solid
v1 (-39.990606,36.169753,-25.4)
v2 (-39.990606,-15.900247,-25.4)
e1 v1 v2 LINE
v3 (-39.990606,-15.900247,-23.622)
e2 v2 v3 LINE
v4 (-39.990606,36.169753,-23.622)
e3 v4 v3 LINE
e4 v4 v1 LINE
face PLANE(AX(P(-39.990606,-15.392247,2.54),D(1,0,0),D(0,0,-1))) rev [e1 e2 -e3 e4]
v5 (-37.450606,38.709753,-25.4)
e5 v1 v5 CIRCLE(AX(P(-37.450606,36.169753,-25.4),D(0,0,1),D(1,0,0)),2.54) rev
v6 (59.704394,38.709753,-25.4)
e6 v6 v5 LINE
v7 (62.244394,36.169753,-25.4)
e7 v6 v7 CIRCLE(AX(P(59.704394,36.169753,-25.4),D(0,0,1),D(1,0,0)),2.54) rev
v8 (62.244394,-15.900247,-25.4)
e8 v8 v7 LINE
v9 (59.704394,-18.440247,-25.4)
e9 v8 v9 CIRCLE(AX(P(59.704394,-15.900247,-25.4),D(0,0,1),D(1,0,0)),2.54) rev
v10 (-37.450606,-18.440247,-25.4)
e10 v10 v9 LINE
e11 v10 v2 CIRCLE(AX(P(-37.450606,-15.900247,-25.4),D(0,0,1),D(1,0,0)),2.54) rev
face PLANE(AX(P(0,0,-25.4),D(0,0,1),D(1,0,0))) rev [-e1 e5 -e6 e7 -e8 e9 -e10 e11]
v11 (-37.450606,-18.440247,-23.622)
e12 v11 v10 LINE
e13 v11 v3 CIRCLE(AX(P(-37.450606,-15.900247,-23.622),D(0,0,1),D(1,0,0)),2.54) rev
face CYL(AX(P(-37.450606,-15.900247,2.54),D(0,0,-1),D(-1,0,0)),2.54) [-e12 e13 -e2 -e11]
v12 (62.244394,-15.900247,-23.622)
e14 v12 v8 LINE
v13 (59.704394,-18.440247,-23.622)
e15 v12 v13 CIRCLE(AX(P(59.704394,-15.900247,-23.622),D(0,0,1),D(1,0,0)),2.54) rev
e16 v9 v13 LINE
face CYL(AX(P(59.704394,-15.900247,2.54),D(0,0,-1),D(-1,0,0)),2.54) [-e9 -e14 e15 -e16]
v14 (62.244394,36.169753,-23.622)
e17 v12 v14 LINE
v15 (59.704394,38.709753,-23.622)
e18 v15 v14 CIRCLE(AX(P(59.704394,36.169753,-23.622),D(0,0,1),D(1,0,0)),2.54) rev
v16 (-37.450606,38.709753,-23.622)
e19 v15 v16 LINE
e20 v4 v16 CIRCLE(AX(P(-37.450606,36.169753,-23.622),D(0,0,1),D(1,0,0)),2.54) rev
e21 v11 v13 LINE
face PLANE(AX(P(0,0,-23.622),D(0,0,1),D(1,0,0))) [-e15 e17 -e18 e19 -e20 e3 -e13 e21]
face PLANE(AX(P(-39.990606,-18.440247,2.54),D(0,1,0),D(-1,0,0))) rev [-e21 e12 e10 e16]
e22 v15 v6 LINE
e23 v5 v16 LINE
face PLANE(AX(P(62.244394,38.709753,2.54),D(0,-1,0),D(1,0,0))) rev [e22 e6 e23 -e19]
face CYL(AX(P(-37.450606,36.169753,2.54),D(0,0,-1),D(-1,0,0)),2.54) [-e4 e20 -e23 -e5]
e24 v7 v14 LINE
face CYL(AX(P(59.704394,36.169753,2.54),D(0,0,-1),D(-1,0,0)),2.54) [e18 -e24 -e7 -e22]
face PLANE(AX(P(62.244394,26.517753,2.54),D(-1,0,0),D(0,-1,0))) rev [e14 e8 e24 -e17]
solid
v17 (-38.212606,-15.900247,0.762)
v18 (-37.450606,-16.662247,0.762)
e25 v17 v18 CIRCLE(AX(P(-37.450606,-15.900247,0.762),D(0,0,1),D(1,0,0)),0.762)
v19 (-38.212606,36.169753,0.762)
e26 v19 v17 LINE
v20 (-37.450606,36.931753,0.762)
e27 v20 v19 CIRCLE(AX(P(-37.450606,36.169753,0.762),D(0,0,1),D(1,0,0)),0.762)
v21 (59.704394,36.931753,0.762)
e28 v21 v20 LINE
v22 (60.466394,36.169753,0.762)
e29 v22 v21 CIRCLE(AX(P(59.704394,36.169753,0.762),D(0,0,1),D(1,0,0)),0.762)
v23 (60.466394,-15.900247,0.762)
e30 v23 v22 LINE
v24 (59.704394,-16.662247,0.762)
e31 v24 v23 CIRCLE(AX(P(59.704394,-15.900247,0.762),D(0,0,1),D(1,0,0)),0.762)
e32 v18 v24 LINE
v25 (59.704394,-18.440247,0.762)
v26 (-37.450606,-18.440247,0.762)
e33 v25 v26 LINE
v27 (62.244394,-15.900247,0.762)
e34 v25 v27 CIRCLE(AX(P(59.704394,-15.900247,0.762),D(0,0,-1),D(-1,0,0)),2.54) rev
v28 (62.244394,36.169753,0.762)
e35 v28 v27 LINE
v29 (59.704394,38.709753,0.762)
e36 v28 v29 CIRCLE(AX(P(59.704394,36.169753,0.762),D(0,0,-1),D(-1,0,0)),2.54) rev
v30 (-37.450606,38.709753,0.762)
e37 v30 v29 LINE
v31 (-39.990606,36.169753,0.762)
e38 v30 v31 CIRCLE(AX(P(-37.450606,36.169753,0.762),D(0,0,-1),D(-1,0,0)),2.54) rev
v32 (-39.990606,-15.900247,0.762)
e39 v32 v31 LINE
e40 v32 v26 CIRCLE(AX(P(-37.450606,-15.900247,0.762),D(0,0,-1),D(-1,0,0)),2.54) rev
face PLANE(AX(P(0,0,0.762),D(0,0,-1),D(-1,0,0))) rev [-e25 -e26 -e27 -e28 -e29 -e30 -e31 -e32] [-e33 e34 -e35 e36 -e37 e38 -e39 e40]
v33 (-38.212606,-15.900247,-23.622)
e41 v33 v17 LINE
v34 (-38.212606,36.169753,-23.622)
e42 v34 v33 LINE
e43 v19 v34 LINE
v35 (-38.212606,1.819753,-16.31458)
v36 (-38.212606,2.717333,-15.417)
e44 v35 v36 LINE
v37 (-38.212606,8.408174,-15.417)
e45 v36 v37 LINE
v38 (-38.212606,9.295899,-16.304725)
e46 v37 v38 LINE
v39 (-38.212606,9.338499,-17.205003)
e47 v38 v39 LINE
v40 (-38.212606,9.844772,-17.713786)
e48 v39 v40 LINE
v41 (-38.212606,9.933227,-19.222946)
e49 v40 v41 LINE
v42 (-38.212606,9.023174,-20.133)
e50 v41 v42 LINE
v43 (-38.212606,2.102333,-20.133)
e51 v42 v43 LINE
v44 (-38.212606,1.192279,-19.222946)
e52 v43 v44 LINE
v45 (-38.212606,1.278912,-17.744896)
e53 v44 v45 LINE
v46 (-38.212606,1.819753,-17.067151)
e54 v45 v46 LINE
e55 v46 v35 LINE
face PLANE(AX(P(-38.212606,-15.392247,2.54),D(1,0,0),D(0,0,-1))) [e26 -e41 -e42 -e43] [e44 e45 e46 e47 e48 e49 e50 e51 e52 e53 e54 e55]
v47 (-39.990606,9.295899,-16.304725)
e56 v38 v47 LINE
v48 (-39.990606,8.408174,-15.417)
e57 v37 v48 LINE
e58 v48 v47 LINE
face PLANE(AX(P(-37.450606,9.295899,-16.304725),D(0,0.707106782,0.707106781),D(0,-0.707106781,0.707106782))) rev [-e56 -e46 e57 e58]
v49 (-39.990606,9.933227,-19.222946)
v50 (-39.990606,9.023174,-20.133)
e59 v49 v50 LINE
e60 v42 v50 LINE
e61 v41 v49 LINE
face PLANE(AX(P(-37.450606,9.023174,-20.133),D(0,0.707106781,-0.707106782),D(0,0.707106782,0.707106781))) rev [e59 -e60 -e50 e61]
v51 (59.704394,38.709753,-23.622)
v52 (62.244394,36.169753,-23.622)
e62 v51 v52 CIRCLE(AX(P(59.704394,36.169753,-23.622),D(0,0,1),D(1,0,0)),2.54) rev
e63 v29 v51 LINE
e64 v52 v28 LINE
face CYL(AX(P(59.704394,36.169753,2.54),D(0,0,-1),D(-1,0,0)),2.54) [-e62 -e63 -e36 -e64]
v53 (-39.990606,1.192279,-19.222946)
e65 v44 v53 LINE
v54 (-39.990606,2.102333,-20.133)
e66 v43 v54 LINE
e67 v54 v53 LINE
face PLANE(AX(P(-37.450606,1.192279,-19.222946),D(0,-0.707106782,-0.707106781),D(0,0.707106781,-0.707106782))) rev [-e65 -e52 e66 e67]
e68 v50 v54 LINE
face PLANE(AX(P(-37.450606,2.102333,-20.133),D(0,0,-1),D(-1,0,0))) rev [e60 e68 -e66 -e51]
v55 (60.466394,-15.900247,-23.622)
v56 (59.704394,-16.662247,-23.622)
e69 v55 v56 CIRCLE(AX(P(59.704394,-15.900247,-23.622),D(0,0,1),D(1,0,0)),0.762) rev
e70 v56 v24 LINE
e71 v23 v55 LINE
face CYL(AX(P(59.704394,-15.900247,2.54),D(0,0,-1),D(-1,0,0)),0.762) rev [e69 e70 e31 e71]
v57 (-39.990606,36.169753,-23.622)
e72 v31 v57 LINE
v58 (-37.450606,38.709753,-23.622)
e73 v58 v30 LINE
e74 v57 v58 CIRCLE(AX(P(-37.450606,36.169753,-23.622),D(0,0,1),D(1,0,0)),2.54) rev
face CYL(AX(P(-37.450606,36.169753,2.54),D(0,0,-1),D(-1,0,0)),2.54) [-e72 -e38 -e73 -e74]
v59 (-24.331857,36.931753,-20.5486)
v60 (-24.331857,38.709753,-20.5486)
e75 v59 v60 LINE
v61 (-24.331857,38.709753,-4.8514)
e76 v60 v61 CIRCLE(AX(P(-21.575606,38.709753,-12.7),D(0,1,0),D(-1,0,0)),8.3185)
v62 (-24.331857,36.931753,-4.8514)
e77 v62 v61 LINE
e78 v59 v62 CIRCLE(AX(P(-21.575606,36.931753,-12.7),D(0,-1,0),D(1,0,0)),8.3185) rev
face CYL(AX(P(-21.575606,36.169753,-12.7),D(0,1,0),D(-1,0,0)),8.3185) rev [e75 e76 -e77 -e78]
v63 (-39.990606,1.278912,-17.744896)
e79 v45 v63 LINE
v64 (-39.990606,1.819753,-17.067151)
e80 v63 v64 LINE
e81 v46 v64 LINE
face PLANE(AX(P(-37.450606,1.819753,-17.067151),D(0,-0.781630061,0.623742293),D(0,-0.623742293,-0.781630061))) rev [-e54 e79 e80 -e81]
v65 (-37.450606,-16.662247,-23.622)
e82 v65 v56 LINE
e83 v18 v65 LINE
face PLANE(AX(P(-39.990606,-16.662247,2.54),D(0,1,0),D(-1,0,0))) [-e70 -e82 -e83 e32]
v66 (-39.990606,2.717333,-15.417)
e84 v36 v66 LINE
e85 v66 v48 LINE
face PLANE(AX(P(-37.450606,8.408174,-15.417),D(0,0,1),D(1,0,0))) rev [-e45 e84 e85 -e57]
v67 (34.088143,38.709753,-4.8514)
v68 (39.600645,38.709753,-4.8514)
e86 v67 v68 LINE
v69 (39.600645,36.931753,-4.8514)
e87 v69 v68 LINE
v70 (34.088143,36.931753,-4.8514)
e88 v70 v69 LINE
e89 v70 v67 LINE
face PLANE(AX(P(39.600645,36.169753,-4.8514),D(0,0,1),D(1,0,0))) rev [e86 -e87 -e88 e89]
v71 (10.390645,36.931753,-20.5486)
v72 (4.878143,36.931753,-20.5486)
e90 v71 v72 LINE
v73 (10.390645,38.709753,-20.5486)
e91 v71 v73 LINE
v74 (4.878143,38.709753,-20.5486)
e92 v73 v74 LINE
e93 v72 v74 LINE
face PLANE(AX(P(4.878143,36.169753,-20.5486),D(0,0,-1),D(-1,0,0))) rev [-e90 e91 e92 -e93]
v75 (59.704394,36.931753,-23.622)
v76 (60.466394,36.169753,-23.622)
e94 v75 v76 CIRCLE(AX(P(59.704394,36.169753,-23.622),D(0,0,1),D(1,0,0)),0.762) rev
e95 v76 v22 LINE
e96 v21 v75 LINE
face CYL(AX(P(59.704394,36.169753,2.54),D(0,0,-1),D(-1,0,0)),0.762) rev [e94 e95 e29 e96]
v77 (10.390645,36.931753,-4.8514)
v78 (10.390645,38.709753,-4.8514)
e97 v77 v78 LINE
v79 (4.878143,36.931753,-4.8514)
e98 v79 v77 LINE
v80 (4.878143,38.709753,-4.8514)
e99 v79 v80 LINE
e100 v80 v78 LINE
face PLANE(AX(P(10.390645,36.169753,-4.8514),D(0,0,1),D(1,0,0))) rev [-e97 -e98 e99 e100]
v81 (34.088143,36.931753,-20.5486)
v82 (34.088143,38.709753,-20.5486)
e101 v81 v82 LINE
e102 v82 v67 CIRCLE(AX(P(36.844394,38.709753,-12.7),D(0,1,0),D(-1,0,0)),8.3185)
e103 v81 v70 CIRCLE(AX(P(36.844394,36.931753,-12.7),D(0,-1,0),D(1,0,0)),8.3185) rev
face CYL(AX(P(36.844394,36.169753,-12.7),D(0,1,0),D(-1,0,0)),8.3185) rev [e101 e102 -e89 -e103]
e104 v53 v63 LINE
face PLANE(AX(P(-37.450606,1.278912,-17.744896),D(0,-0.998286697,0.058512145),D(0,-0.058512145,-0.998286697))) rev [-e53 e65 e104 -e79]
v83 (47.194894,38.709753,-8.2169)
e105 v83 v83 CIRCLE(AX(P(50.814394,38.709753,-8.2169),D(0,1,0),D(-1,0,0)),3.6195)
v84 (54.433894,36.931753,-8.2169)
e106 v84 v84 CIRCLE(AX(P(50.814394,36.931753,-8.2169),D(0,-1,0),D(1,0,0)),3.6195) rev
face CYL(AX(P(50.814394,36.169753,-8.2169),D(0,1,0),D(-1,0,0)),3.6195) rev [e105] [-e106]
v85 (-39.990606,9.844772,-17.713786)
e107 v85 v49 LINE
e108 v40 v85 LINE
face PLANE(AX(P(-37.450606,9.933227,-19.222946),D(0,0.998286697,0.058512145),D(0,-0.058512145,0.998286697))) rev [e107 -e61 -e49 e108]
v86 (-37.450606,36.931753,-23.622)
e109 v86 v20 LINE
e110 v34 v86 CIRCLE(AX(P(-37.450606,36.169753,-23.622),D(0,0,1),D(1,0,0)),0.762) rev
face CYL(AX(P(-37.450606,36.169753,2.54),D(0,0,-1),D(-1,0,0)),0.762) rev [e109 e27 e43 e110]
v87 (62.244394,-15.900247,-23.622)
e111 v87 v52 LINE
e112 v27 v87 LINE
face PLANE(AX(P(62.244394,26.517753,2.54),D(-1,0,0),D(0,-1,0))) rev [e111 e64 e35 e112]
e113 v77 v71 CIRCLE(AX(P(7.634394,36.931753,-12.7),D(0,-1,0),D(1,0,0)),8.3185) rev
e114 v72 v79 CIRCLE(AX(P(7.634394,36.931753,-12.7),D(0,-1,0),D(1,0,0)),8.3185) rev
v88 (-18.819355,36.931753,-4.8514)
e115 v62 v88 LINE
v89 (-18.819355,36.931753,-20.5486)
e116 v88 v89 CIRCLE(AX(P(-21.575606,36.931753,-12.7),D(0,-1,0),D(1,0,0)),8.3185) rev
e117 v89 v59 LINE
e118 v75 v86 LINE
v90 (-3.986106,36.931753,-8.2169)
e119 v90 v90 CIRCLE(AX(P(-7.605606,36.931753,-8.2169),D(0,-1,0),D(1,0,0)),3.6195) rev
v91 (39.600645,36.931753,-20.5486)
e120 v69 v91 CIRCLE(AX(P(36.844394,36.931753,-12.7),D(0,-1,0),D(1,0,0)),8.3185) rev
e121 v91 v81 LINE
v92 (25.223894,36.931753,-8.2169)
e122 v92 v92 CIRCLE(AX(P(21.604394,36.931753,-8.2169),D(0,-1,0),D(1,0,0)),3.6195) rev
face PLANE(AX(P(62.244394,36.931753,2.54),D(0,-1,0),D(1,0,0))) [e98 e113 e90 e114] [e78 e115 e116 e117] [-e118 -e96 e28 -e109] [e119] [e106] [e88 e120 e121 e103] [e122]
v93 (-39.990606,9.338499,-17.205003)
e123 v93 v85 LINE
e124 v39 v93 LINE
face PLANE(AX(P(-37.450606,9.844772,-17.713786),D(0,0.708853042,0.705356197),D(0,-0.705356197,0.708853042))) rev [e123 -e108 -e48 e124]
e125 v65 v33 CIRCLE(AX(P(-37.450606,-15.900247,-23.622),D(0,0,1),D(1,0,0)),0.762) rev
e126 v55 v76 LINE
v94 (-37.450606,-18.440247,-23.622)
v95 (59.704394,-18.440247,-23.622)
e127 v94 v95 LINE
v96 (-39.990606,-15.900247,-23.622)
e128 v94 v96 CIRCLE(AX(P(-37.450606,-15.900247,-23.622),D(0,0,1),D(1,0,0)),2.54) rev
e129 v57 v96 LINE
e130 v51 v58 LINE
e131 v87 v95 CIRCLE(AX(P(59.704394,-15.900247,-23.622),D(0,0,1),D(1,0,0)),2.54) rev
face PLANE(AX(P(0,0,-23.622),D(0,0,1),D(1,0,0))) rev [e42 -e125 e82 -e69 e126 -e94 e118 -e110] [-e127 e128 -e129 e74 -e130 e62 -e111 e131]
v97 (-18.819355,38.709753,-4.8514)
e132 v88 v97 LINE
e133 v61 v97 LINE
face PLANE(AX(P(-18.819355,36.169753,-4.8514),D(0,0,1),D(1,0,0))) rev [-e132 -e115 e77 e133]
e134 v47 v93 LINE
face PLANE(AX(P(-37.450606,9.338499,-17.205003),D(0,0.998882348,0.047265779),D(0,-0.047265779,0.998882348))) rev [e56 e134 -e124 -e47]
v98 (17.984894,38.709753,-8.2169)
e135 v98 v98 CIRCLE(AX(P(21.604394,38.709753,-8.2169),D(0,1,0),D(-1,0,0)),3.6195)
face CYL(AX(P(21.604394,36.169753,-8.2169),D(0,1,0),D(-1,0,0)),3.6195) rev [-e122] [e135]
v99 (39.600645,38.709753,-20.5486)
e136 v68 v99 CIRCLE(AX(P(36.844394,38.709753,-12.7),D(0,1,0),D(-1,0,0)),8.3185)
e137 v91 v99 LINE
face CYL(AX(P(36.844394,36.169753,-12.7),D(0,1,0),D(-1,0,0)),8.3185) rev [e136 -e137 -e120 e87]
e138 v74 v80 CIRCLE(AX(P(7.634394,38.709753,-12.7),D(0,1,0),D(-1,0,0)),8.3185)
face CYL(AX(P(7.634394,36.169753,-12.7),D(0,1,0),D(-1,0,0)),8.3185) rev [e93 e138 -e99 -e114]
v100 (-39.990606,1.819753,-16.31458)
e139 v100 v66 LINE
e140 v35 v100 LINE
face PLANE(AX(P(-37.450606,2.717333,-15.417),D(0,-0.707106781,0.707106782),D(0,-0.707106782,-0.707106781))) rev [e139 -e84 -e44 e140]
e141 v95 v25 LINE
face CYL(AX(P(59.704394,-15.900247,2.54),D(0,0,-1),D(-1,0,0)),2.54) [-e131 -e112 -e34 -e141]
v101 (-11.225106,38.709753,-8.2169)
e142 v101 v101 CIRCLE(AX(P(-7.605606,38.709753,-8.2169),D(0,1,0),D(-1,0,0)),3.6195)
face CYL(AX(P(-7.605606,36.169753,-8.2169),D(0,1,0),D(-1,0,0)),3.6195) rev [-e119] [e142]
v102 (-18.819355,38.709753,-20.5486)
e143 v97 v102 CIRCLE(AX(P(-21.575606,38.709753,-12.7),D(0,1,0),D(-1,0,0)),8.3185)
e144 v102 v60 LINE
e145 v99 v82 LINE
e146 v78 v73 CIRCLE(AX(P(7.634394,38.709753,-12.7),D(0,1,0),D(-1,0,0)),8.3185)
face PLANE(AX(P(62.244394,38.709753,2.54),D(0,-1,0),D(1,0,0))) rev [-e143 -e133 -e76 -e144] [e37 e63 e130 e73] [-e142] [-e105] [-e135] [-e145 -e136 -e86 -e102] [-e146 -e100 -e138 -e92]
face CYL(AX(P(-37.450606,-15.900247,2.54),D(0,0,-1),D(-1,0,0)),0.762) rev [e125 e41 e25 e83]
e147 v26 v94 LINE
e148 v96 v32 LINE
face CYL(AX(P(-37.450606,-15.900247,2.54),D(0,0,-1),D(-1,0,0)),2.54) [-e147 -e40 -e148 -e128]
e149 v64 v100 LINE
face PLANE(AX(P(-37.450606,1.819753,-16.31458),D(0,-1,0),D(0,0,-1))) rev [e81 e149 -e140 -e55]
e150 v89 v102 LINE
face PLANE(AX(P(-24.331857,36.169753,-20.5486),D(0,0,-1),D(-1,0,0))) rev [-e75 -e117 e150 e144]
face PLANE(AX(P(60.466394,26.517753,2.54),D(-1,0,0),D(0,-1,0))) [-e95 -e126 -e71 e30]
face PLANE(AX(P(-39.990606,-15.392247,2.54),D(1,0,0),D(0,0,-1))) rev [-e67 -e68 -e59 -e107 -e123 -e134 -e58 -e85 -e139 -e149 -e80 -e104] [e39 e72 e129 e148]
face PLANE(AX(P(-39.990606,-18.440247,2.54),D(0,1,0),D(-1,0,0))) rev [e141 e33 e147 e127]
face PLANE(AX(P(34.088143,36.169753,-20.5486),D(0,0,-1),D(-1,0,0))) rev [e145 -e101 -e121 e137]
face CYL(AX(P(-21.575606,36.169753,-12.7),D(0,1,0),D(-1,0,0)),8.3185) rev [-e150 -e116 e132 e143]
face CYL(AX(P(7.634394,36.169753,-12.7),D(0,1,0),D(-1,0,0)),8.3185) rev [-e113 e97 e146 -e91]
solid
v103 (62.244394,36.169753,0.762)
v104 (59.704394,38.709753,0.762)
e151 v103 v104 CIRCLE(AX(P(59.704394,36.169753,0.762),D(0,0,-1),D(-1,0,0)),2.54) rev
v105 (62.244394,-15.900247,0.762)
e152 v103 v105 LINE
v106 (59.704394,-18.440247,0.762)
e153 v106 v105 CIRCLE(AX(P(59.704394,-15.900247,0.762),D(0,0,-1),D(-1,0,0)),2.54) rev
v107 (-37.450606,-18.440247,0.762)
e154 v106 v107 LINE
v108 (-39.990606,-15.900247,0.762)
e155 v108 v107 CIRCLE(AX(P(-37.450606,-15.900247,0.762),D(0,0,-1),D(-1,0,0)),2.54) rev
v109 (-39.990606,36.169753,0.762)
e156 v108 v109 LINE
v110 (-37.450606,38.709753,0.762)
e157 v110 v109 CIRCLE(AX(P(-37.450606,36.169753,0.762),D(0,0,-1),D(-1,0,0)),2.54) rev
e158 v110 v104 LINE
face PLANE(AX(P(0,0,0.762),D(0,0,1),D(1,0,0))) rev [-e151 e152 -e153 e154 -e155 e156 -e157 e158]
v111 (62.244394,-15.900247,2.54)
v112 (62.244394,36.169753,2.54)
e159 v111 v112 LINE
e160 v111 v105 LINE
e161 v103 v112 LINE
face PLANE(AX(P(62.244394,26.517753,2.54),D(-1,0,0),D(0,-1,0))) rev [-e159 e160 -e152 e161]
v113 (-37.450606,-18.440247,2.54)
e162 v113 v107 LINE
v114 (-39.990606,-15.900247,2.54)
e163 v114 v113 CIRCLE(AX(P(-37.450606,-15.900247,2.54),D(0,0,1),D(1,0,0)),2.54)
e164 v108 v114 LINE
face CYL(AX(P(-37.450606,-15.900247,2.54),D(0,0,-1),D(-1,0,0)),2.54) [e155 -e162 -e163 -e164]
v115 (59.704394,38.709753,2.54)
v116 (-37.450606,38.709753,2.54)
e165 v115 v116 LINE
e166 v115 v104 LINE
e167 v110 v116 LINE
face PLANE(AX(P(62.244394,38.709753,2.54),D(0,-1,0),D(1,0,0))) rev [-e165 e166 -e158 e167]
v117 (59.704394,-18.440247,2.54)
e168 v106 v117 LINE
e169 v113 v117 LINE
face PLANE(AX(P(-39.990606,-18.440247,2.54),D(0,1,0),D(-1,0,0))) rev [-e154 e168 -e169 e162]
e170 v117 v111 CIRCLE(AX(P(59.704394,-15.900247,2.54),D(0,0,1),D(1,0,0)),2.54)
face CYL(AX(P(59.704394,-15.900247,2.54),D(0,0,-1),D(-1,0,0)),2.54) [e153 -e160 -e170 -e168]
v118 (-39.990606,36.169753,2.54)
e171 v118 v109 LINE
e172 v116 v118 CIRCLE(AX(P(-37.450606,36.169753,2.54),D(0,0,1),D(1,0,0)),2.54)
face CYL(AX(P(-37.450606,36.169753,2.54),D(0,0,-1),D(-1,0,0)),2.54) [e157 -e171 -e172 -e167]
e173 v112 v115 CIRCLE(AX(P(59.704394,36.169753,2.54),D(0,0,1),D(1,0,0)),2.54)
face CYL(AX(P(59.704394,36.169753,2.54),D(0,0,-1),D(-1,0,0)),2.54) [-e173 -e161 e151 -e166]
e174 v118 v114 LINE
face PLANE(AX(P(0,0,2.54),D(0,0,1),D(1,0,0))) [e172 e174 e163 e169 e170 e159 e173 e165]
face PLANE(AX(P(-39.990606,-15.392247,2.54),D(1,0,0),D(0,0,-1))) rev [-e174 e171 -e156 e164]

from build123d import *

# Parameters (mm, degrees)
BOSS_EXTRUDE1_DEPTH      = 2.54
BOSS_EXTRUDE1_DEPTH_BACK = 25.4
CUT_EXTRUDE1_DEPTH       = 2.54
SKETCH4_R                = 3.6195
CUT_EXTRUDE3_DEPTH       = 2.54
FILLET1_R                = 2.54
SKETCH3_W                = 11.508
SKETCH3_H                = 9.508
CUT_EXTRUDE2_DEPTH       = 1.27
SKETCH7_W                = 14.782
SKETCH7_H                = 12.682999998
BOSS_EXTRUDE2_DEPTH      = 2.54
SHELL1_START             = -23.622
SHELL1_DEPTH             = 24.384
SPLIT1_START             = -25.4
SPLIT1_DEPTH             = 1.778
SPLIT1_2_DEPTH           = 1.778
SPLIT1_START_2           = 0.762
SPLIT1_3_DEPTH           = 1.778
SPLIT1_4_DEPTH           = 1.778


# Read off the part's stored shape, not the designer's step: Shell1, Split1
with BuildPart() as part:
    # Sketch1 → Boss-Extrude1 (new, two sides: drawn at the far end of the back side and taken through both)
    with BuildSketch(Plane.XY.offset(-BOSS_EXTRUDE1_DEPTH_BACK)):
        Polygon((-39.990606027, -18.440246583), (62.244393973, -18.440246583), (62.244393973, -15.392246583), (62.244393973, 26.517753417), (62.244393973, 38.709753417), (-39.990606027, 38.709753417), (-39.990606027, 26.517753417), (-39.990606027, -15.392246583), align=None)
    extrude(amount=BOSS_EXTRUDE1_DEPTH + BOSS_EXTRUDE1_DEPTH_BACK)

    # Sketch2 → Cut-Extrude1 (cut)
    with BuildSketch(Plane.ZY.offset(39.990606027)):
        Polygon((-20.133, 2.102332927), (-20.133, 9.023173906), (-19.222946487, 9.93322742), (-17.713785822, 9.844771641), (-17.205002954, 9.338498651), (-16.304724783, 9.29589869), (-15.417, 8.408173907), (-15.417, 2.717332928), (-16.31457951, 1.819753417), (-17.067151023, 1.819753417), (-17.744895832, 1.278911755), (-19.222946485, 1.192279414), align=None)
    extrude(amount=-CUT_EXTRUDE1_DEPTH, mode=Mode.SUBTRACT)

    # Sketch4 → Cut-Extrude3 (cut)
    with BuildSketch(Plane(origin=(0, 38.709753417, 0), x_dir=(1, 0, 0), z_dir=(0, 1, 0))):
        with Locations(Location((-7.605606027, 8.2169, 0), (0, 0, 180))):
            Circle(SKETCH4_R)
        with Locations(Location((21.604393973, 8.2169, 0), (0, 0, 180))):
            Circle(SKETCH4_R)
        with Locations(Location((50.814393973, 8.2169, 0), (0, 0, 180))):
            Circle(SKETCH4_R)
        with BuildLine():
            Line((-24.331857157, 20.5486), (-18.819354898, 20.5486))
            ThreePointArc((-18.819354898, 20.5486), (-13.257106027, 12.7), (-18.819354898, 4.8514))
            Line((-18.819354898, 4.8514), (-24.331857157, 4.8514))
            ThreePointArc((-24.331857157, 4.8514), (-29.894106027, 12.7), (-24.331857157, 20.5486))
        make_face()
        with BuildLine():
            Line((10.390645102, 4.8514), (4.878142843, 4.8514))
            ThreePointArc((4.878142843, 4.8514), (-0.684106027, 12.7), (4.878142843, 20.5486))
            Line((4.878142843, 20.5486), (10.390645102, 20.5486))
            ThreePointArc((10.390645102, 20.5486), (15.952893973, 12.7), (10.390645102, 4.8514))
        make_face()
        with BuildLine():
            Line((39.600645102, 4.8514), (34.088142843, 4.8514))
            ThreePointArc((34.088142843, 4.8514), (28.525893973, 12.7), (34.088142843, 20.5486))
            Line((34.088142843, 20.5486), (39.600645102, 20.5486))
            ThreePointArc((39.600645102, 20.5486), (45.162893973, 12.7), (39.600645102, 4.8514))
        make_face()
    extrude(amount=-CUT_EXTRUDE3_DEPTH, mode=Mode.SUBTRACT)

    # Fillet1
    fillet1_edges = [part.edges().sort_by_distance(p)[0] for p in [
        (-39.990606027, 38.709753417, -11.43),
        (62.244393973, 38.709753417, -11.43),
        (62.244393973, -18.440246583, -11.43),
        (-39.990606027, -18.440246583, -11.43),
    ]]
    fillet(fillet1_edges, radius=FILLET1_R)

    # Sketch3 → Cut-Extrude2 (cut)
    with BuildSketch(Plane.ZY.offset(39.990606027)):
        with Locations((-8.929, 4.610253417)):
            Rectangle(SKETCH3_W, SKETCH3_H)
    extrude(amount=-CUT_EXTRUDE2_DEPTH, mode=Mode.SUBTRACT)

    # Sketch7 → Boss-Extrude2 (add)
    with BuildSketch(Plane.ZY.offset(39.990606027)):
        with Locations((-8.026, 5.562753418)):
            Rectangle(SKETCH7_W, SKETCH7_H)
    extrude(amount=-BOSS_EXTRUDE2_DEPTH)

    # Shell1 outline → Shell1 (cut)
    with BuildSketch(Plane.XY.offset(SHELL1_START)):
        with BuildLine():
            Line((-38.212606027, 1.819753417), (-38.212606027, -15.900246583))
            ThreePointArc((-38.212606027, -15.900246583), (-37.989421394, -16.43906195), (-37.450606027, -16.662246583))
            Line((-37.450606027, -16.662246583), (59.704393973, -16.662246583))
            ThreePointArc((59.704393973, -16.662246583), (60.24320934, -16.43906195), (60.466393973, -15.900246583))
            Line((60.466393973, -15.900246583), (60.466393973, 36.169753417))
            ThreePointArc((60.466393973, 36.169753417), (60.24320934, 36.708568784), (59.704393973, 36.931753417))
            Line((59.704393973, 36.931753417), (-37.450606027, 36.931753417))
            ThreePointArc((-37.450606027, 36.931753417), (-37.989421394, 36.708568784), (-38.212606027, 36.169753417))
            Line((-38.212606027, 36.169753417), (-38.212606027, 1.819753417))
        make_face()
    extrude(amount=SHELL1_DEPTH, mode=Mode.SUBTRACT)

    # Split1 2 outline → Split1 2 (cut)
    with BuildSketch(Plane.XY.offset(SPLIT1_START)):
        with BuildLine():
            Line((-37.450606027, -18.440246583), (59.704393973, -18.440246583))
            ThreePointArc((59.704393973, -18.440246583), (61.500445197, -17.696297807), (62.244393973, -15.900246583))
            Line((62.244393973, -15.900246583), (62.244393973, 36.169753417))
            ThreePointArc((62.244393973, 36.169753417), (61.500445197, 37.965804641), (59.704393973, 38.709753417))
            Line((59.704393973, 38.709753417), (-37.450606027, 38.709753417))
            ThreePointArc((-37.450606027, 38.709753417), (-39.246657251, 37.965804641), (-39.990606027, 36.169753417))
            Line((-39.990606027, 36.169753417), (-39.990606027, -15.900246583))
            ThreePointArc((-39.990606027, -15.900246583), (-39.246657251, -17.696297807), (-37.450606027, -18.440246583))
        make_face()
    extrude(amount=SPLIT1_2_DEPTH, mode=Mode.SUBTRACT)

    # Split1 3 outline → Split1 3 (cut)
    with BuildSketch(Plane.XY.offset(SPLIT1_START_2)):
        with BuildLine():
            Line((-37.450606027, -18.440246583), (59.704393973, -18.440246583))
            ThreePointArc((59.704393973, -18.440246583), (61.500445197, -17.696297807), (62.244393973, -15.900246583))
            Line((62.244393973, -15.900246583), (62.244393973, 36.169753417))
            ThreePointArc((62.244393973, 36.169753417), (61.500445197, 37.965804641), (59.704393973, 38.709753417))
            Line((59.704393973, 38.709753417), (-37.450606027, 38.709753417))
            ThreePointArc((-37.450606027, 38.709753417), (-39.246657251, 37.965804641), (-39.990606027, 36.169753417))
            Line((-39.990606027, 36.169753417), (-39.990606027, -15.900246583))
            ThreePointArc((-39.990606027, -15.900246583), (-39.246657251, -17.696297807), (-37.450606027, -18.440246583))
        make_face()
    extrude(amount=SPLIT1_3_DEPTH, mode=Mode.SUBTRACT)


with BuildPart() as body_2:
    # Split1 outline → Split1 (new body)
    with BuildSketch(Plane.XY.offset(SPLIT1_START)):
        with BuildLine():
            Line((-39.990606027, 36.169753417), (-39.990606027, -15.900246583))
            ThreePointArc((-39.990606027, -15.900246583), (-39.246657251, -17.696297807), (-37.450606027, -18.440246583))
            Line((-37.450606027, -18.440246583), (59.704393973, -18.440246583))
            ThreePointArc((59.704393973, -18.440246583), (61.500445197, -17.696297807), (62.244393973, -15.900246583))
            Line((62.244393973, -15.900246583), (62.244393973, 36.169753417))
            ThreePointArc((62.244393973, 36.169753417), (61.500445197, 37.965804641), (59.704393973, 38.709753417))
            Line((59.704393973, 38.709753417), (-37.450606027, 38.709753417))
            ThreePointArc((-37.450606027, 38.709753417), (-39.246657251, 37.965804641), (-39.990606027, 36.169753417))
        make_face()
    extrude(amount=SPLIT1_DEPTH)


with BuildPart() as body_3:
    # Split1 4 outline → Split1 4 (new body)
    with BuildSketch(Plane.XY.offset(SPLIT1_START_2)):
        with BuildLine():
            Line((-39.990606027, 36.169753417), (-39.990606027, -15.900246583))
            ThreePointArc((-39.990606027, -15.900246583), (-39.246657251, -17.696297807), (-37.450606027, -18.440246583))
            Line((-37.450606027, -18.440246583), (59.704393973, -18.440246583))
            ThreePointArc((59.704393973, -18.440246583), (61.500445197, -17.696297807), (62.244393973, -15.900246583))
            Line((62.244393973, -15.900246583), (62.244393973, 36.169753417))
            ThreePointArc((62.244393973, 36.169753417), (61.500445197, 37.965804641), (59.704393973, 38.709753417))
            Line((59.704393973, 38.709753417), (-37.450606027, 38.709753417))
            ThreePointArc((-37.450606027, 38.709753417), (-39.246657251, 37.965804641), (-39.990606027, 36.169753417))
        make_face()
    extrude(amount=SPLIT1_4_DEPTH)


solid = Compound([part.part, body_2.part, body_3.part])
